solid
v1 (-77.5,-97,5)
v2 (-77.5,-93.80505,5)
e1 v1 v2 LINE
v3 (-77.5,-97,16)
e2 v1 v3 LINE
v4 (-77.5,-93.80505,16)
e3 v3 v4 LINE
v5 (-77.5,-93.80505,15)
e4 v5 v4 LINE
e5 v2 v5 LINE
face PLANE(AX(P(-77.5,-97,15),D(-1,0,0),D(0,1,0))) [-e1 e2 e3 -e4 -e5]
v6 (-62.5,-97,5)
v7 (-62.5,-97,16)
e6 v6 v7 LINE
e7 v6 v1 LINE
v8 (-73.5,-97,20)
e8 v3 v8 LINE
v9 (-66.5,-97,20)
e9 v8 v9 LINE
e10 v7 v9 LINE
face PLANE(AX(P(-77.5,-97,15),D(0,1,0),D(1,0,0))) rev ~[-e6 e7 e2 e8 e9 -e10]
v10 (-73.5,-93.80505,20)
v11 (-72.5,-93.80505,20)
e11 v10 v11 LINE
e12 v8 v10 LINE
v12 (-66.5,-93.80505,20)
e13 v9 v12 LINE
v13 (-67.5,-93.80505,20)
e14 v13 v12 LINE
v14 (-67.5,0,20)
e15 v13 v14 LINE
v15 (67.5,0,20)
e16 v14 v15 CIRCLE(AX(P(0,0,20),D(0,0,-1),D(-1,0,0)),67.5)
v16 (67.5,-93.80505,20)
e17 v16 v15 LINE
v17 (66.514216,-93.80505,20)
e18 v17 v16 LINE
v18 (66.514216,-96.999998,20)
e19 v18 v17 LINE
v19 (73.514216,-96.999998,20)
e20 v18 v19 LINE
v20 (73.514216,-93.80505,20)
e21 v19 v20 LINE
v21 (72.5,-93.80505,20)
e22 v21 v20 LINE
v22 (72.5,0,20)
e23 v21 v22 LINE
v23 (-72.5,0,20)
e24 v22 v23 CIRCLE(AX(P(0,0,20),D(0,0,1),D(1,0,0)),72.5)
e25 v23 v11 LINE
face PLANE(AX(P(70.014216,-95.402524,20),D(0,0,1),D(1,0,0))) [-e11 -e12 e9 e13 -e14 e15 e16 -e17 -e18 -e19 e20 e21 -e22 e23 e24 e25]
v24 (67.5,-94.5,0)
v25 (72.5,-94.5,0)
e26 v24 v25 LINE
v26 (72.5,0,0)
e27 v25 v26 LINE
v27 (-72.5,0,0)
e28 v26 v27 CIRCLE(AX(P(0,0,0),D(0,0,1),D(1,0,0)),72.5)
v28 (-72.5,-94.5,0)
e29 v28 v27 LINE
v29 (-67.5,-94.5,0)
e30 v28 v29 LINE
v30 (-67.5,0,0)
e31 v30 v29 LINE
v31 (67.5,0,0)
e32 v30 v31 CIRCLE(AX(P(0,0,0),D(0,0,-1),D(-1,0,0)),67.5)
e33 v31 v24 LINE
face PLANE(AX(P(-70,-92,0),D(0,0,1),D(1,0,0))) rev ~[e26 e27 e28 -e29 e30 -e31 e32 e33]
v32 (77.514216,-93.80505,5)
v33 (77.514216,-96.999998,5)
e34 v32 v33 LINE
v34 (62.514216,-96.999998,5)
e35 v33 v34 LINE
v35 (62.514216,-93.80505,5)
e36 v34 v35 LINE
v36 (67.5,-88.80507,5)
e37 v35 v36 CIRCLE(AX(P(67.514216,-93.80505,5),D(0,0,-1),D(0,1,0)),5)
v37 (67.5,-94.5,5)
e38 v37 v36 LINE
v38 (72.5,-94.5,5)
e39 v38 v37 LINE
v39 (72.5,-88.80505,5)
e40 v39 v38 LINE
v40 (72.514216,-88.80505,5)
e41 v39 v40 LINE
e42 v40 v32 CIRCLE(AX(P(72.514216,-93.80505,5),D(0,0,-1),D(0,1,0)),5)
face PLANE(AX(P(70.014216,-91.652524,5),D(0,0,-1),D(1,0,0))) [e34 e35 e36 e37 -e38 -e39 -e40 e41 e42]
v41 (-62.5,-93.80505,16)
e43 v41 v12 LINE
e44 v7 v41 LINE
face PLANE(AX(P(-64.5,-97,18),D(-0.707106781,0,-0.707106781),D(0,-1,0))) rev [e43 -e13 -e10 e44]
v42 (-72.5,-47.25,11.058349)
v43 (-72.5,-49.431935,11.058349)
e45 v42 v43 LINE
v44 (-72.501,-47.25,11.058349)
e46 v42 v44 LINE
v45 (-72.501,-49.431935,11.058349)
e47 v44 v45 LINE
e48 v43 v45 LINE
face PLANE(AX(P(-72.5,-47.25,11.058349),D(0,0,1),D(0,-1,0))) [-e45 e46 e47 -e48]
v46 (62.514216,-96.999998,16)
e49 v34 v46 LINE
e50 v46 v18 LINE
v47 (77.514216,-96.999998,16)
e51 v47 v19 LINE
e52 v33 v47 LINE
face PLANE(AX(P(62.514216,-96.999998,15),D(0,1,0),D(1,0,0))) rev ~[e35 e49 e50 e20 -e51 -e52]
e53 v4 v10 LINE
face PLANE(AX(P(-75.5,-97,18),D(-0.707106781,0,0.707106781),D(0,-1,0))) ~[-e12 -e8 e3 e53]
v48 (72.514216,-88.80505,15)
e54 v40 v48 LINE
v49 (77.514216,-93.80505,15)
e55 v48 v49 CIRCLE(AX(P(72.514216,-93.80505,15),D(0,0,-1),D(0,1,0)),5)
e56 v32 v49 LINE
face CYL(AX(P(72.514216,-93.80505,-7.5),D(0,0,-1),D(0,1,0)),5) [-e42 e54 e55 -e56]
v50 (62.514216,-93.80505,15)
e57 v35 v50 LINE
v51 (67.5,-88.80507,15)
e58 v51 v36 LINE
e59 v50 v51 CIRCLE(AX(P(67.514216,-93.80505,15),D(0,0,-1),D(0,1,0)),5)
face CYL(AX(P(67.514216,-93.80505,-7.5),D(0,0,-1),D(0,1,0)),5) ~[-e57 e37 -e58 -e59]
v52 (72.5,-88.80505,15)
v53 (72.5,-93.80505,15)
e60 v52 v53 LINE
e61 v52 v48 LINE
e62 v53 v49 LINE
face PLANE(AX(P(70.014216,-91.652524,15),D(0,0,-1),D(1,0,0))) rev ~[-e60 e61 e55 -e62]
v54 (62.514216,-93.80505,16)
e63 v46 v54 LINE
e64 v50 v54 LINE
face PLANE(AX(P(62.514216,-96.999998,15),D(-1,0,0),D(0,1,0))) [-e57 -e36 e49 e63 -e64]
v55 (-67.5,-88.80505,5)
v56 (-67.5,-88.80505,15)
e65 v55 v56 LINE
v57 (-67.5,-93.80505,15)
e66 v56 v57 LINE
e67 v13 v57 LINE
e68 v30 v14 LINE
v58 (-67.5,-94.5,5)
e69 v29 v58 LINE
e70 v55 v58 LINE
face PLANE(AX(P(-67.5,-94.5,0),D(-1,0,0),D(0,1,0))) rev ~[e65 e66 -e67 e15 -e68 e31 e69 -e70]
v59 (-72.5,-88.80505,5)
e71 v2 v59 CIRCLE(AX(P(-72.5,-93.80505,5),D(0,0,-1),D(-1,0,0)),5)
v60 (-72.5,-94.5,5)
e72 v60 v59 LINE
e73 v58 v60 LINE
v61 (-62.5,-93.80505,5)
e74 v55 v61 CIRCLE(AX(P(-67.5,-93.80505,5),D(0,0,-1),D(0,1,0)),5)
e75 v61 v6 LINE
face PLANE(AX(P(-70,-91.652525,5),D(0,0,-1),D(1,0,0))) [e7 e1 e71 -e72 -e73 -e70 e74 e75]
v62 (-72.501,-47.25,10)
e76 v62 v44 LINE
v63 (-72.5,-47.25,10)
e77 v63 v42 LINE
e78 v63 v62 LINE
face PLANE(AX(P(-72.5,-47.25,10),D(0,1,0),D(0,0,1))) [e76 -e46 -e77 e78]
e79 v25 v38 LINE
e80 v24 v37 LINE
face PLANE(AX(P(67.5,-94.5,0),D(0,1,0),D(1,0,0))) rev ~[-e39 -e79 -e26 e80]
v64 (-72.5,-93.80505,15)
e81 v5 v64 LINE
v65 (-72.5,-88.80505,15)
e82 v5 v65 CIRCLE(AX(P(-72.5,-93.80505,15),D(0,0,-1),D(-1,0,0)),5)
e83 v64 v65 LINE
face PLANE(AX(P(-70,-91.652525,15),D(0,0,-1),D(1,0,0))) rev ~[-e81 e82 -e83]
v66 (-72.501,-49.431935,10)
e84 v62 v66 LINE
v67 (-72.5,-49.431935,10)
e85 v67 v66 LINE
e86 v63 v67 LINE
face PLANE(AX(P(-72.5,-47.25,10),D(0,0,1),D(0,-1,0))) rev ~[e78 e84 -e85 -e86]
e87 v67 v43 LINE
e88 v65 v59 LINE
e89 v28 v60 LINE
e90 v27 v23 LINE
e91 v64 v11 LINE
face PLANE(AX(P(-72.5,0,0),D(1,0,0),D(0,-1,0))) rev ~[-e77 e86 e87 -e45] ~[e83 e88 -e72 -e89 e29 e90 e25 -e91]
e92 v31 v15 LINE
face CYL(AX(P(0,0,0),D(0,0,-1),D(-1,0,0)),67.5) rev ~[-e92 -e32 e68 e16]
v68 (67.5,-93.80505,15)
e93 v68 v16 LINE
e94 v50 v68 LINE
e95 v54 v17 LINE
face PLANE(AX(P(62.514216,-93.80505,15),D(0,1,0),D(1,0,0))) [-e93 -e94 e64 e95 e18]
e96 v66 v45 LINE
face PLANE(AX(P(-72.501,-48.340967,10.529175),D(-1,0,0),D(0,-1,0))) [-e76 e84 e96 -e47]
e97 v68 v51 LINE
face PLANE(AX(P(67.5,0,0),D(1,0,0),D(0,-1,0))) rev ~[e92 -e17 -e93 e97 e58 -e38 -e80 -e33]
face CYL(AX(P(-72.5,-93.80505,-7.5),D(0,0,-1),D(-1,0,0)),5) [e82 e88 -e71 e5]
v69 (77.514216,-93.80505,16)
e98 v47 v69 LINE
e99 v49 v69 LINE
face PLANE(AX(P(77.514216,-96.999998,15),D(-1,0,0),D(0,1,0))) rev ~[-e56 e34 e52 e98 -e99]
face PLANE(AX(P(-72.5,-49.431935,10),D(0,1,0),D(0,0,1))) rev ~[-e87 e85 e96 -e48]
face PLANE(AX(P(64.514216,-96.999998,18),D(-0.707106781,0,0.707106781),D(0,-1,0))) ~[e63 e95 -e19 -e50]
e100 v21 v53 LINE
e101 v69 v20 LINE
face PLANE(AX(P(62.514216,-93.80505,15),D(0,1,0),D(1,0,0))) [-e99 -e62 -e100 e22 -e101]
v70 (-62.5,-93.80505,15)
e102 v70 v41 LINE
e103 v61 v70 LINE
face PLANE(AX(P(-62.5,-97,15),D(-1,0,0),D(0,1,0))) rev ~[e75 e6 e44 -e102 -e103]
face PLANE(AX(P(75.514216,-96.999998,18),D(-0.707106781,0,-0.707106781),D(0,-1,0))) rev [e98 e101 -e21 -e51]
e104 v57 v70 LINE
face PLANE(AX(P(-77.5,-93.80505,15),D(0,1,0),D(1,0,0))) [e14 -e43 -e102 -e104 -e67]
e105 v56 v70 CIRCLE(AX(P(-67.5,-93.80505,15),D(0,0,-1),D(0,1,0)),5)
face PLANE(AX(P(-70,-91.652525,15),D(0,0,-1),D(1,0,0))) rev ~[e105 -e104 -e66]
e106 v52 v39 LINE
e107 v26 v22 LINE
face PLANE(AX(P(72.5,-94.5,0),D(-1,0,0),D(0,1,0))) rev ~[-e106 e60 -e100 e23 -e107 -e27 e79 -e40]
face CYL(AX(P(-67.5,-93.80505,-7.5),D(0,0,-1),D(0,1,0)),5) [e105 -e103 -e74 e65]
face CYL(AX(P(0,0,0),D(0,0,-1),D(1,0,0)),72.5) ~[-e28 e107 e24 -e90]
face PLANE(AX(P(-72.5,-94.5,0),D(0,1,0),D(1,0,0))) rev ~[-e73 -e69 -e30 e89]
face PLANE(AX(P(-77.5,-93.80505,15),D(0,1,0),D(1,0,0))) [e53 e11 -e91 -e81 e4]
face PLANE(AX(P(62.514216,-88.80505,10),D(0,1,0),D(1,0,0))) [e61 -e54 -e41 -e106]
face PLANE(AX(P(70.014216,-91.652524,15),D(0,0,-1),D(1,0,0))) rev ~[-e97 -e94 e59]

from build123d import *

# Parameters (mm, degrees)
F0_W        = 5
F0_H        = 5
F1_DEPTH    = 20
F2_W        = 2.1819349527
F2_H        = 1.0583491623
F3_DEPTH    = 0.001
F5_DEPTH    = 5
F6_T1_DEPTH = 35
F6_T6_DEPTH = 35
F7_W        = 15
F7_H        = 3.1949503422
F8_DEPTH    = 5
F9_W        = 15
F9_H        = 3.1949481368
F10_DEPTH   = 5
F11_SIZE    = 4


# Not quite as in the source:
# - a fillet or chamfer that OpenCascade refuses, or shapes differently, is made with other operations: its cross-section is extruded or revolved along the edge and cut away or added


with BuildPart() as f1:
    # F0 (on Top) → F1 (new body)
    with BuildSketch(Plane.XY):
        with Locations((-70, -92)):
            Rectangle(F0_W, F0_H)
        with Locations((70, -92)):
            Rectangle(F0_W, F0_H)
        with BuildLine():
            Line((-67.5, -89.5), (-67.5, -26.4575131106))
            ThreePointArc((-67.5, -26.4575131106), (-71.2390342439, -13.4629120178), (-72.5, 0))
            Line((-72.5, 0), (-72.5, -89.5))
            Line((-72.5, -89.5), (-67.5, -89.5))
        make_face()
        with BuildLine():
            ThreePointArc((72.5, 0), (71.2390342439, -13.4629120178), (67.5, -26.4575131106))
            Line((67.5, -26.4575131106), (67.5, -89.5))
            Line((67.5, -89.5), (72.5, -89.5))
            Line((72.5, -89.5), (72.5, 0))
        make_face()
        with BuildLine():
            ThreePointArc((-67.5, 0), (0, 67.5), (67.5, 0))
            Line((67.5, 0), (67.5, -26.4575131106))
            ThreePointArc((67.5, -26.4575131106), (71.2390342439, -13.4629120178), (72.5, 0))
            ThreePointArc((72.5, 0), (0, 72.5), (-72.5, 0))
            ThreePointArc((-72.5, 0), (-71.2390342439, -13.4629120178), (-67.5, -26.4575131106))
            Line((-67.5, -26.4575131106), (-67.5, 0))
        make_face()
    extrude(amount=F1_DEPTH)

    # F2 (on face) → F3 (join)
    with BuildSketch(Plane(origin=(-72.5, 0, 0), x_dir=(0, -1, 0), z_dir=(-1, 0, 0))):
        with Locations((48.3409674764, 10.5291745812)):
            Rectangle(F2_W, F2_H)
    extrude(amount=F3_DEPTH)

    # F4 (on face) → F5 (join, symmetric)
    with BuildSketch(Plane(origin=(0, 0, 10), x_dir=(1, 0, 0), z_dir=(0, 0, -1))):
        Polygon((-67.5, 94.5), (-72.5, 94.5), (-77.5, 94.5), (-77.5, 88.8050496578), (-62.5, 88.8050496578), (-62.5, 94.5), align=None)
        Polygon((-77.5, 94.5), (-72.5, 94.5), (-67.5, 94.5), (-62.5, 94.5), (-62.5, 97), (-77.5, 97), align=None)
        Polygon((72.5142157078, 94.4999977946), (67.5142157078, 94.4999977946), (62.5142157078, 94.4999977946), (62.5142157078, 88.8050496578), (77.5142157078, 88.8050496578), (77.5142157078, 94.4999977946), align=None)
        Polygon((62.5142157078, 94.4999977946), (67.5142157078, 94.4999977946), (72.5142157078, 94.4999977946), (77.5142157078, 94.4999977946), (77.5142157078, 96.9999977946), (62.5142157078, 96.9999977946), align=None)
    extrude(amount=F5_DEPTH, both=True)

    # F6: fillet of radius 5 on 4 edges, made by hand

    # F6_s2 → F6_t1 (cut)
    with BuildSketch(Plane.XY.offset(-7.5)):
        with BuildLine():
            ThreePointArc((-77.5, -93.8050496578), (-76.0355339059, -90.2695157519), (-72.5, -88.8050496578))
            Line((-72.5, -88.8050496578), (-77.5, -88.8050496578))
            Line((-77.5, -88.8050496578), (-77.5, -93.8050496578))
        make_face()
        with BuildLine():
            ThreePointArc((72.5142157078, -88.8050496578), (76.0497496137, -90.2695157519), (77.5142157078, -93.8050496578))
            Line((77.5142157078, -93.8050496578), (77.5142157078, -88.8050496578))
            Line((77.5142157078, -88.8050496578), (72.5142157078, -88.8050496578))
        make_face()
        with BuildLine():
            ThreePointArc((-67.5, -88.8050496578), (-63.9644660941, -90.2695157519), (-62.5, -93.8050496578))
            Line((-62.5, -93.8050496578), (-62.5, -88.8050496578))
            Line((-62.5, -88.8050496578), (-67.5, -88.8050496578))
        make_face()
    extrude(amount=F6_T1_DEPTH, mode=Mode.SUBTRACT)


with BuildPart() as f6_tool4:
    # F6_s5 → F6_t6 (new body)
    with BuildSketch(Plane.XY.offset(-7.5)):
        with BuildLine():
            ThreePointArc((67.5142157078, -88.8050496578), (63.9786818018, -90.2695157519), (62.5142157078, -93.8050496578))
            Line((62.5142157078, -93.8050496578), (62.5142157078, -88.8050496578))
            Line((62.5142157078, -88.8050496578), (67.5142157078, -88.8050496578))
        make_face()
    extrude(amount=F6_T6_DEPTH)

    split(bisect_by=Plane.YZ.offset(67.5), keep=Keep.BOTTOM)


with BuildPart() as f1_1:
    add(f1.part)

    # F6_t3: cut F6_tool4
    add(f6_tool4.part, mode=Mode.SUBTRACT)

    # F7 (on face) → F8 (join)
    with BuildSketch(Plane.XY.offset(15)):
        with Locations((-70, -95.4025248289)):
            Rectangle(F7_W, F7_H)
    extrude(amount=F8_DEPTH)

    # F9 (on face) → F10 (join)
    with BuildSketch(Plane.XY.offset(15)):
        with Locations((70.0142157078, -95.4025237262)):
            Rectangle(F9_W, F9_H)
    extrude(amount=F10_DEPTH)

    # F11
    f11_edges = [f1_1.edges().sort_by_distance(p)[0] for p in [
        (-77.5, -95.402525, 20),
        (62.514216, -95.402524, 20),
        (-62.5, -95.402525, 20),
        (77.514216, -95.402524, 20),
    ]]
    chamfer(f11_edges, length=F11_SIZE)


solid = f1_1.part
